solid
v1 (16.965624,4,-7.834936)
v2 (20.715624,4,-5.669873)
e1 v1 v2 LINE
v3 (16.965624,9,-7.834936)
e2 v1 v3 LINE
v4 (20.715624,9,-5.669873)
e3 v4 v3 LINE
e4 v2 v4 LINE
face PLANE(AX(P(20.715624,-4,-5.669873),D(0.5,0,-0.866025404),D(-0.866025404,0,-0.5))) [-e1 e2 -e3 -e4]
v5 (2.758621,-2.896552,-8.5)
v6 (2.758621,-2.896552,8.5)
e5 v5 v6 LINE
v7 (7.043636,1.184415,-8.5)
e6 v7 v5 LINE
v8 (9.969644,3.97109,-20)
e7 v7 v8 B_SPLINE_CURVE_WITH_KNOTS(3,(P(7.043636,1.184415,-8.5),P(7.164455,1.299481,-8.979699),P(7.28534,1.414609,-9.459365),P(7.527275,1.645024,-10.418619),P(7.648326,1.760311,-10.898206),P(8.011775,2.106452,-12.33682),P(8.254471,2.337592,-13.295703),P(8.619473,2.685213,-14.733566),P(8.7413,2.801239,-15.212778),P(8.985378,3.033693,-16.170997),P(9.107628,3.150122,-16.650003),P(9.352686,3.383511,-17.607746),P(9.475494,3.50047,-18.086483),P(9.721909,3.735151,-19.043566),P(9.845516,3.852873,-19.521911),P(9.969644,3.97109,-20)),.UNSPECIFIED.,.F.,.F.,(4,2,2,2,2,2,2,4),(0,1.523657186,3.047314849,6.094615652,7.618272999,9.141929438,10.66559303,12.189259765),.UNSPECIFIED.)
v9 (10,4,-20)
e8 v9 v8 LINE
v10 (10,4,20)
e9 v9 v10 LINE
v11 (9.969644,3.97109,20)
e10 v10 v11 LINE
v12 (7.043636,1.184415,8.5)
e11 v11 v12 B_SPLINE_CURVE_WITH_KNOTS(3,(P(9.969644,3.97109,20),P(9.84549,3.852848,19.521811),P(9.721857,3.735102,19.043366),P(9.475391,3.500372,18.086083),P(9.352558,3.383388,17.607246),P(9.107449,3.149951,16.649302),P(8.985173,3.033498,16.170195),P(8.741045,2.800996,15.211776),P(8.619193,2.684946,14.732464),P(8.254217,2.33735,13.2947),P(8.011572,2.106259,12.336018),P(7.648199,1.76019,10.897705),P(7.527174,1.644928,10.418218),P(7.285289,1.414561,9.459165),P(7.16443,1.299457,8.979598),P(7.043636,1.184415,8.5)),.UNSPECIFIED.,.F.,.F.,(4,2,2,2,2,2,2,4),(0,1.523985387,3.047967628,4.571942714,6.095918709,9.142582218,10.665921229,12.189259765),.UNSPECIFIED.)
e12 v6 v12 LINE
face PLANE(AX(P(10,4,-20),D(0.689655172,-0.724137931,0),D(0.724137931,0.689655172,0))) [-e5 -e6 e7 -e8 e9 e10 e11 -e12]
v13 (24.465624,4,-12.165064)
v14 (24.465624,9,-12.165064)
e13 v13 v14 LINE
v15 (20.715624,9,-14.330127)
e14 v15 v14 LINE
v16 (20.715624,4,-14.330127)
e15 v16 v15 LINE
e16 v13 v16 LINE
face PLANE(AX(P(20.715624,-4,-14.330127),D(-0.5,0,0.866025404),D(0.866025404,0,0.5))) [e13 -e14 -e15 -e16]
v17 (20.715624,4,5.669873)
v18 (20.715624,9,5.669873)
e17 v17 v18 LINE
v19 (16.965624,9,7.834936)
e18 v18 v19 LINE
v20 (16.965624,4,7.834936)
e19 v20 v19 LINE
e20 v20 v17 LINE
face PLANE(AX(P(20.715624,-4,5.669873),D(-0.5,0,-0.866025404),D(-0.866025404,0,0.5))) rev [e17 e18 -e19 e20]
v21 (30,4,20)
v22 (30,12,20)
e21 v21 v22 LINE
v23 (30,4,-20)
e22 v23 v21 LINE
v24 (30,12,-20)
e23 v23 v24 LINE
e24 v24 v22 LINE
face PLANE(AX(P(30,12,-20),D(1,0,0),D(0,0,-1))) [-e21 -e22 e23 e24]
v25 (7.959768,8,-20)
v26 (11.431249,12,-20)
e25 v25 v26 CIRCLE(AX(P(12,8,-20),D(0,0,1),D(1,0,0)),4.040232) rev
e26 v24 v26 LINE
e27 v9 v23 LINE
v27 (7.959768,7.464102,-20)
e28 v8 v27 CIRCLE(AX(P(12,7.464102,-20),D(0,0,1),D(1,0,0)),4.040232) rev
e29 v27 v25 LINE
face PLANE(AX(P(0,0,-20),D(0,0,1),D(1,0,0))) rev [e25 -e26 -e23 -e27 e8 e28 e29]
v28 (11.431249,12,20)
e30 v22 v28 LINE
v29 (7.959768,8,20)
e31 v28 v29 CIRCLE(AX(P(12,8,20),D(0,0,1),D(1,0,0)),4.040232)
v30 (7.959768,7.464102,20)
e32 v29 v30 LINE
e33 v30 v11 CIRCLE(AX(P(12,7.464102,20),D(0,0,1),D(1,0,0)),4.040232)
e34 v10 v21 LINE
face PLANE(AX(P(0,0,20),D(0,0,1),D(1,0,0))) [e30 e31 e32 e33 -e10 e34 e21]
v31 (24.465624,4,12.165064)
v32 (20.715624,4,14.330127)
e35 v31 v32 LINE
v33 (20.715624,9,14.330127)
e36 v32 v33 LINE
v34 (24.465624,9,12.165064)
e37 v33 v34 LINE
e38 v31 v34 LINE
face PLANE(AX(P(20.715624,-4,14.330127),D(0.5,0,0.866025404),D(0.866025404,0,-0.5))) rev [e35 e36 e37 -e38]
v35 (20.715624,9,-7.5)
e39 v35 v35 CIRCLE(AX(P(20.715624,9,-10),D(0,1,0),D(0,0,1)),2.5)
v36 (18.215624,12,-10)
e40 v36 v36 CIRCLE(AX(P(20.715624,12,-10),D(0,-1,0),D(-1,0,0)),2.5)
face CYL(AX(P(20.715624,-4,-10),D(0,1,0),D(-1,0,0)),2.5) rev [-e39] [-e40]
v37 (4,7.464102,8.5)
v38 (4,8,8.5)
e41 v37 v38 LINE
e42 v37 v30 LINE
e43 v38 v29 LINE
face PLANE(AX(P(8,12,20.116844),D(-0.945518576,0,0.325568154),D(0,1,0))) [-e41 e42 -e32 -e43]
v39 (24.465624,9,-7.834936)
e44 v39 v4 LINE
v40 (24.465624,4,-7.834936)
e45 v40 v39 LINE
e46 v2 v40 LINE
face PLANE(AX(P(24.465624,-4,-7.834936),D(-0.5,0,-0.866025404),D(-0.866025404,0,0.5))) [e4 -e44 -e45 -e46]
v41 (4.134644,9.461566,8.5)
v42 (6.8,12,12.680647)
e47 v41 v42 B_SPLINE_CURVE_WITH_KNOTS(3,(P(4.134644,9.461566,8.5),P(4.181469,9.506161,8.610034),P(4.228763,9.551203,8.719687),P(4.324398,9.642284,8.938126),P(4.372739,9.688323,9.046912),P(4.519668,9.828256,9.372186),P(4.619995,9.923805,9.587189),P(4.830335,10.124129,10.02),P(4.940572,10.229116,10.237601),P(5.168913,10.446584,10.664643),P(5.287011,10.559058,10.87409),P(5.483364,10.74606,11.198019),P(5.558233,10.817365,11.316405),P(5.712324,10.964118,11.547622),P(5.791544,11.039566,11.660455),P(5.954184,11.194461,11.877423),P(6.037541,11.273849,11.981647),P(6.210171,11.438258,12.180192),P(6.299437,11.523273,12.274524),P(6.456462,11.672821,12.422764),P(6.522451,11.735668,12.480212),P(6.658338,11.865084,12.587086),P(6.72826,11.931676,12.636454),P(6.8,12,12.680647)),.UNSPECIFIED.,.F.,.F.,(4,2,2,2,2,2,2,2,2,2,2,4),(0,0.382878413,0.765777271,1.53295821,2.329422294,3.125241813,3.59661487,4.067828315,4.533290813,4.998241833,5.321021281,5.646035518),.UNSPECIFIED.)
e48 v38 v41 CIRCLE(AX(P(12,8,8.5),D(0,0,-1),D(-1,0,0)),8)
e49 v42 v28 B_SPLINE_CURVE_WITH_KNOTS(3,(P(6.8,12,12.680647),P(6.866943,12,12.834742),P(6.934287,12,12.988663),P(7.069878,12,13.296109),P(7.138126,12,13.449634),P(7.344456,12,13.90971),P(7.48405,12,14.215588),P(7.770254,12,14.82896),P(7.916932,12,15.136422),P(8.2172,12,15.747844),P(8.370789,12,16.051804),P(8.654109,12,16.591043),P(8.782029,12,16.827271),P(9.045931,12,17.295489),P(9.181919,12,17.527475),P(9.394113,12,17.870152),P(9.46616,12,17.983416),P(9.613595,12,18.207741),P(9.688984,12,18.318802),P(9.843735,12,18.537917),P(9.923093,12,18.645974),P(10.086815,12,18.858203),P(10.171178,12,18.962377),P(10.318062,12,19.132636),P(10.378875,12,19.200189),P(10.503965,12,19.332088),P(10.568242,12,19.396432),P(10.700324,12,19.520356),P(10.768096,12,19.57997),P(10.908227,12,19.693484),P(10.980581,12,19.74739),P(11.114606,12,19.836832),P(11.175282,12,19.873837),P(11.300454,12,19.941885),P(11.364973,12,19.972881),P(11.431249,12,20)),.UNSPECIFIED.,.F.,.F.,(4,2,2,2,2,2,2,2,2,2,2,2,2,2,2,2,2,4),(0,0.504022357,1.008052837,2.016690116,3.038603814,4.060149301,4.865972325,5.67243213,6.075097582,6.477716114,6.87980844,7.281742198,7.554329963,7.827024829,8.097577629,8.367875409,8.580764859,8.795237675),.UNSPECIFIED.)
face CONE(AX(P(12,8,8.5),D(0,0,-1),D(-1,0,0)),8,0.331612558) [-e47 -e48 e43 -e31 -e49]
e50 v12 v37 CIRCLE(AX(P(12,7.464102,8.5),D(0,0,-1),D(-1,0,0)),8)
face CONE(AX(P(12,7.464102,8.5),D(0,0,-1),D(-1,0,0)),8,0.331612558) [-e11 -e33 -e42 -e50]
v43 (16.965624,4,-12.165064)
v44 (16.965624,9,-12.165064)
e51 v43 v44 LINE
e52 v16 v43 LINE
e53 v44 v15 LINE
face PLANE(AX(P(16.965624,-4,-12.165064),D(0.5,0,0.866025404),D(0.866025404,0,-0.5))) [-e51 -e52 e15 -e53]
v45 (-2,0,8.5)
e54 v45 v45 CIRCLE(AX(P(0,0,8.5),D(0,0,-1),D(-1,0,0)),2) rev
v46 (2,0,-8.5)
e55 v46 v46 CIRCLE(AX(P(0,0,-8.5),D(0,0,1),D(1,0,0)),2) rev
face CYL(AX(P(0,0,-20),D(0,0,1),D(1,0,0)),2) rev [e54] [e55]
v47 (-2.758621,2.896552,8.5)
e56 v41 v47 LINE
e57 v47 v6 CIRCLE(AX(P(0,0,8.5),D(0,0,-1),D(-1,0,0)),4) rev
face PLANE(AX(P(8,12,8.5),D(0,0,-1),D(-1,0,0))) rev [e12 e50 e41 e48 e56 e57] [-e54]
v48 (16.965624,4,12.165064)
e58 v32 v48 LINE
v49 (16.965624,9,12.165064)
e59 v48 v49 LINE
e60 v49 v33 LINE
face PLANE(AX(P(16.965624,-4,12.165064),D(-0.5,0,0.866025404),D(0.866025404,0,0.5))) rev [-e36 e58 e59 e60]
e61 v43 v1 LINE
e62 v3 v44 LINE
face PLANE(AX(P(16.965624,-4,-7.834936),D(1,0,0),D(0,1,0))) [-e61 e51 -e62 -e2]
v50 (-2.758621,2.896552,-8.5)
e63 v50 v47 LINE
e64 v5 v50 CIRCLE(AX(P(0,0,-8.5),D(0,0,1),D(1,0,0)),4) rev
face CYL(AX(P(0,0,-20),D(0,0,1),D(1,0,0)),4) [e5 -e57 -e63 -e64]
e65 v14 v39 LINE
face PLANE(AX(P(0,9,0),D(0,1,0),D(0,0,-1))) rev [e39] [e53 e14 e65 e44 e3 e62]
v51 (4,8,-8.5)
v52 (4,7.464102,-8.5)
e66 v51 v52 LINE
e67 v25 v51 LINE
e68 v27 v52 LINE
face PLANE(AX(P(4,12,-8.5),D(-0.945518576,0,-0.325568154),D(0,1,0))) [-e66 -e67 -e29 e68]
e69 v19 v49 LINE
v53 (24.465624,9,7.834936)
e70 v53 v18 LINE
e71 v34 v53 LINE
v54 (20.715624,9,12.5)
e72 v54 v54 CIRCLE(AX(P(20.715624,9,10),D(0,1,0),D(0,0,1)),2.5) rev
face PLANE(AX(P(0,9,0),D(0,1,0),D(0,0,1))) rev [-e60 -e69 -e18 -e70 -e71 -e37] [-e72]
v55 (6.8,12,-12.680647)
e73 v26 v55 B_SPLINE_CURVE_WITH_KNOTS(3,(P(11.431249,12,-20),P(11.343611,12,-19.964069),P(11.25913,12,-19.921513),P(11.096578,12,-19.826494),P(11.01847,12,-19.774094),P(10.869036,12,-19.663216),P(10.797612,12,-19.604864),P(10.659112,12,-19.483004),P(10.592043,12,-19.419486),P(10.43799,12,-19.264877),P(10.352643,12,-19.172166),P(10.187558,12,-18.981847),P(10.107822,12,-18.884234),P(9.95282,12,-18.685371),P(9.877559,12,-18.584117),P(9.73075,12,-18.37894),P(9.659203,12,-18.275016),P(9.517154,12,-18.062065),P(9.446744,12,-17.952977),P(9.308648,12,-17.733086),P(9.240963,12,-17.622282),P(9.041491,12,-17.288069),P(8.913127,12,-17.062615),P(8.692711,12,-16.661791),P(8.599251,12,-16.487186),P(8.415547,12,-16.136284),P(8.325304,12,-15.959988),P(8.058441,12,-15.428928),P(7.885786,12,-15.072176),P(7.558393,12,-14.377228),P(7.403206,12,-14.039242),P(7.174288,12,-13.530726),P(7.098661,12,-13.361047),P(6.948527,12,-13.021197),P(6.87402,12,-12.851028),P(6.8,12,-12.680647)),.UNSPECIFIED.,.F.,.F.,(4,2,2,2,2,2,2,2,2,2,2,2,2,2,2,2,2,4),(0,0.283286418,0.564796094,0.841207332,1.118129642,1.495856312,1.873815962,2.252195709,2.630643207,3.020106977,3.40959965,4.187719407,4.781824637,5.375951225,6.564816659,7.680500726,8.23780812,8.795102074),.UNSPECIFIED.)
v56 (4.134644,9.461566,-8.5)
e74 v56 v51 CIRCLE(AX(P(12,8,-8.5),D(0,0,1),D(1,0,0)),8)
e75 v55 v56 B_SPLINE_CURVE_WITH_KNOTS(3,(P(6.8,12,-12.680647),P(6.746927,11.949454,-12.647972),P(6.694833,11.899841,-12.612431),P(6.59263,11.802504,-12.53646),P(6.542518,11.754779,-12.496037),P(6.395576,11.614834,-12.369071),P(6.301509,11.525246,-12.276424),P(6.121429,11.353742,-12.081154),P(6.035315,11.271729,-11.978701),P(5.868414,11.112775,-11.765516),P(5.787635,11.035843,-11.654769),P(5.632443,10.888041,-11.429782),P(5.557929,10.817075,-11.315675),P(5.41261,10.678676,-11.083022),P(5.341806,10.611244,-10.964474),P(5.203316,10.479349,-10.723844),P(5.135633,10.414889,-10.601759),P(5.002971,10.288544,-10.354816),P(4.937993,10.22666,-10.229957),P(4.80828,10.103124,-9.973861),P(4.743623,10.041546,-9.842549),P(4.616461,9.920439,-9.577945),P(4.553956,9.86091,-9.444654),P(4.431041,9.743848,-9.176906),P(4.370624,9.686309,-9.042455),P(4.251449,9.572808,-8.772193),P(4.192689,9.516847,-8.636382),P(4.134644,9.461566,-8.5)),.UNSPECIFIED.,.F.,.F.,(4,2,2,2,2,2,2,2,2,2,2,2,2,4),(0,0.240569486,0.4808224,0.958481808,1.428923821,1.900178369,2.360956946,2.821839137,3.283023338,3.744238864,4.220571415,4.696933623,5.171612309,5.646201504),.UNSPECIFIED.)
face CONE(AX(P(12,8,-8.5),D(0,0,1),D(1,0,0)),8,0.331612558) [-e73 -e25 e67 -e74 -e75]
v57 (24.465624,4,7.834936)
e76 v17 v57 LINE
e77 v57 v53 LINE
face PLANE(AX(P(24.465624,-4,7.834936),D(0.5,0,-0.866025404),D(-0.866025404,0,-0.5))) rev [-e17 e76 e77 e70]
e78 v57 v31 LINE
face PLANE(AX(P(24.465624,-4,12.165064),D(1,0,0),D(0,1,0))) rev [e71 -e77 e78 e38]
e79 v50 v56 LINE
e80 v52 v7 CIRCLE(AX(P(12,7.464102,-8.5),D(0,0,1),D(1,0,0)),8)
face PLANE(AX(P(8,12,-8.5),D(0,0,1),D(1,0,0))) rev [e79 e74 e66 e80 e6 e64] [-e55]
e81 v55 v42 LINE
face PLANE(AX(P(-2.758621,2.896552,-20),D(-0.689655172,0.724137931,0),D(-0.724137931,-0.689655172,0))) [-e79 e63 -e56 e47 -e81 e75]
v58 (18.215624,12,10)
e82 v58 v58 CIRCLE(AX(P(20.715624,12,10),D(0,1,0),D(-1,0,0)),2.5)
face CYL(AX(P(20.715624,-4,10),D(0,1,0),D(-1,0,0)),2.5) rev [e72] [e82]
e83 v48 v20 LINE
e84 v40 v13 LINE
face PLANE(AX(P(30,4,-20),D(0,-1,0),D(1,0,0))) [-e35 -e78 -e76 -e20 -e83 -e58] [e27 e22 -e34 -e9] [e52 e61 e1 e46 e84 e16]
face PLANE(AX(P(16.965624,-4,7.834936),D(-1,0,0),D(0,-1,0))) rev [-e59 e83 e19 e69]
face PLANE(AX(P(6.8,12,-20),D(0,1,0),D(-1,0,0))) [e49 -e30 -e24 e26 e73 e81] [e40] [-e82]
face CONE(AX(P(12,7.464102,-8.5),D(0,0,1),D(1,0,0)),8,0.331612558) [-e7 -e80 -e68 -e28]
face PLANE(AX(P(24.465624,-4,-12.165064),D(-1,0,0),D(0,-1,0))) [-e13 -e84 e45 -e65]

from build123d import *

# Parameters (mm, degrees)
SKETCH1_R               = 2
BOSS_EXTRUDE1_DEPTH     = 20
CUT_EXTRUDE1_DEPTH      = 37.932370625
CUT_EXTRUDE1_DEPTH_BACK = 37.932370625
SKETCH2_W               = 20
SKETCH2_H               = 16.5
FILLET1_R               = 4
CHAMFER1_SIZE           = 4
CHAMFER1_SIZE_2         = 11.616843511
SKETCH4_R               = 2.5
CUT_EXTRUDE2_DEPTH      = 40.446165847
CUT_EXTRUDE3_START      = -3
CUT_EXTRUDE3_DEPTH      = 37.446165847


with BuildPart() as part:
    # Sketch1 → Boss-Extrude1 (new, symmetric)
    with BuildSketch(Plane.XY):
        with BuildLine():
            Line((-2.75862069, 2.896551724), (6.8, 12))
            Line((6.8, 12), (30, 12))
            Line((30, 12), (30, 4))
            Line((30, 4), (10, 4))
            Line((10, 4), (2.75862069, -2.896551724))
            ThreePointArc((2.75862069, -2.896551724), (-2.896551724, -2.75862069), (-2.75862069, 2.896551724))
        make_face()
        Circle(SKETCH1_R, mode=Mode.SUBTRACT)
    extrude(amount=BOSS_EXTRUDE1_DEPTH, both=True)

    # Sketch2 → Cut-Extrude1 (cut, two sides: drawn at the far end of the back side and taken through both)
    with BuildSketch(Plane.XZ.offset(-4).offset(-CUT_EXTRUDE1_DEPTH_BACK)):
        with Locations((-2, 16.75)):
            Rectangle(SKETCH2_W, SKETCH2_H)
        with Locations((-2, -16.75)):
            Rectangle(SKETCH2_W, SKETCH2_H)
    extrude(amount=CUT_EXTRUDE1_DEPTH + CUT_EXTRUDE1_DEPTH_BACK, mode=Mode.SUBTRACT)

    # Fillet1
    # the kernel refuses this fillet: 4 mm, written as the material it takes off along each edge
    with BuildSketch(Plane(origin=(8, 2.095238095, -33.4221588), x_dir=(0.7241379310344825, 0.6896551724137934, 0), z_dir=(0, 0, 1))) as fillet1_piece_1:
        with BuildLine():
            CenterArc((6.599216221, 1.129177032), FILLET1_R, 136.397181027, 60)
            Line((3.702664496, 3.887797721), (3.644733462, 3.942970135))
            Line((3.644733462, 3.942970135), (-0.057931034, 0.055172414))
            Line((-0.057931034, 0.055172414), (0, -0.08))
            ThreePointArc((0, -0.08), (1.380952381, -0.08), (2.685158533, -0.022583541))
            Line((2.685158533, -0.022583541), (2.761904762, 0))
        make_face()
    extrude(amount=24.9221588, mode=Mode.SUBTRACT)
    with BuildSketch(Plane(origin=(8, 12, -8.5), x_dir=(0, -1, 0), z_dir=(0, 0, -1))) as fillet1_piece_2:
        with BuildLine():
            CenterArc((FILLET1_R, -FILLET1_R), FILLET1_R, 90, 90)
            Line((0, -FILLET1_R), (-FILLET1_R * 0.02, -FILLET1_R))
            Line((-FILLET1_R * 0.02, -FILLET1_R), (-FILLET1_R * 0.02, FILLET1_R * 0.02))
            Line((-FILLET1_R * 0.02, FILLET1_R * 0.02), (FILLET1_R, FILLET1_R * 0.02))
            Line((FILLET1_R, FILLET1_R * 0.02), (FILLET1_R, 0))
        make_face()
    extrude(amount=21.5, mode=Mode.SUBTRACT)
    with BuildSketch(Plane(origin=(8, 12, 8.5), x_dir=(0, -1, 0), z_dir=(0, 0, 1))) as fillet1_piece_3:
        with BuildLine():
            CenterArc((FILLET1_R, FILLET1_R), FILLET1_R, 180, 90)
            Line((0, FILLET1_R), (-FILLET1_R * 0.02, FILLET1_R))
            Line((-FILLET1_R * 0.02, FILLET1_R), (-FILLET1_R * 0.02, -FILLET1_R * 0.02))
            Line((-FILLET1_R * 0.02, -FILLET1_R * 0.02), (FILLET1_R, -FILLET1_R * 0.02))
            Line((FILLET1_R, -FILLET1_R * 0.02), (FILLET1_R, 0))
        make_face()
    extrude(amount=21.5, mode=Mode.SUBTRACT)
    with BuildSketch(Plane(origin=(8, 2.095238095, 33.4221588), x_dir=(0.7241379310344824, 0.6896551724137936, 0), z_dir=(0, 0, -1))) as fillet1_piece_4:
        with BuildLine():
            CenterArc((6.599216221, -1.129177032), FILLET1_R, 163.602818973, 60)
            Line((3.702664496, -3.887797721), (3.644733462, -3.942970135))
            Line((3.644733462, -3.942970135), (-0.057931034, -0.055172414))
            Line((-0.057931034, -0.055172414), (0, 0.08))
            ThreePointArc((0, 0.08), (1.380952381, 0.08), (2.685158533, 0.022583541))
            Line((2.685158533, 0.022583541), (2.761904762, 0))
        make_face()
    extrude(amount=24.9221588, mode=Mode.SUBTRACT)

    # Chamfer1
    # the kernel refuses this chamfer: 11.616843511, 4 mm, written as the material it adds along each edge
    with BuildSketch(Plane(origin=(12, 8, -8.5), x_dir=(-1, 0, 0), z_dir=(0, -1, 0))) as chamfer1_piece_1_section:
        Polygon((4 + CHAMFER1_SIZE, 0), (4, CHAMFER1_SIZE_2), (4, 0), align=None)
    chamfer1_piece_1 = revolve(axis=Axis((12, 8, -8.5), (0, 0, -1)), revolution_arc=359.64, mode=Mode.PRIVATE)
    chamfer1_piece_1 = split(chamfer1_piece_1, bisect_by=Plane(origin=(6.815559228, 9.673675178, -20), z_dir=(0, 0, 1)), keep=Keep.TOP, mode=Mode.PRIVATE)
    chamfer1_piece_1 = split(chamfer1_piece_1, bisect_by=Plane(origin=(6.815559228, 12, -12.048091189), z_dir=(0, -1, 0)), keep=Keep.TOP, mode=Mode.PRIVATE)
    chamfer1_piece_1 = split(chamfer1_piece_1, bisect_by=Plane(origin=(5.646379541, 10.901313849, -12.048091189), z_dir=(0.6896551724137935, -0.7241379310344824, 0)), keep=Keep.TOP, mode=Mode.PRIVATE)
    chamfer1_piece_1 = split(chamfer1_piece_1, bisect_by=Plane(origin=(11.163620921, 5.1082104, -12.048091189), z_dir=(-0.6896551724137935, 0.7241379310344825, 0)), keep=Keep.TOP, mode=Mode.PRIVATE)
    add(chamfer1_piece_1)
    with BuildSketch(Plane(origin=(8, 7.464101615, -8.5), x_dir=(-0.9944459243087849, 0, 0.10524877018591122), z_dir=(0, 1, 0))) as chamfer1_piece_2_section:
        Polygon((CHAMFER1_SIZE * 0.994445924309, -CHAMFER1_SIZE * 0.105248770186), (-CHAMFER1_SIZE_2 * 0.105248770183, -CHAMFER1_SIZE_2 * 0.994445924283), (0, 0), align=None)
    chamfer1_piece_2 = extrude(amount=0.535898385, mode=Mode.PRIVATE)
    chamfer1_piece_2 = split(chamfer1_piece_2, bisect_by=Plane(origin=(6.666533122, 7.732050808, -20), z_dir=(0, 0, 1)), keep=Keep.TOP, mode=Mode.PRIVATE)
    add(chamfer1_piece_2)
    with BuildSketch(Plane(origin=(12, 7.464101615, -8.5), x_dir=(-1, 0, 0), z_dir=(0, 1, 0))) as chamfer1_piece_3_section:
        Polygon((4 + CHAMFER1_SIZE, 0), (4, -CHAMFER1_SIZE_2), (4, 0), align=None)
    chamfer1_piece_3 = revolve(axis=Axis((12, 7.464101615, -8.5), (0, 0, 1)), revolution_arc=359.64, mode=Mode.PRIVATE)
    chamfer1_piece_3 = split(chamfer1_piece_3, bisect_by=Plane(origin=(6.73533338, 5.888138527, -20), z_dir=(0, 0, 1)), keep=Keep.TOP, mode=Mode.PRIVATE)
    chamfer1_piece_3 = split(chamfer1_piece_3, bisect_by=Plane(origin=(6.73533338, 12, -12.010330429), z_dir=(0, -1, 0)), keep=Keep.TOP, mode=Mode.PRIVATE)
    chamfer1_piece_3 = split(chamfer1_piece_3, bisect_by=Plane(origin=(3.713793343, 9.060755565, -12.010330429), z_dir=(0.6896551724137935, -0.7241379310344824, 0)), keep=Keep.TOP, mode=Mode.PRIVATE)
    chamfer1_piece_3 = split(chamfer1_piece_3, bisect_by=Plane(origin=(9.231034723, 3.267652117, -12.010330429), z_dir=(-0.6896551724137935, 0.7241379310344825, 0)), keep=Keep.TOP, mode=Mode.PRIVATE)
    add(chamfer1_piece_3)
    with BuildSketch(Plane(origin=(12, 8, 8.5), x_dir=(-0.9999802608561372, -0.006283143965558626, 0), z_dir=(-0.006283143965558626, 0.9999802608561372, 0))) as chamfer1_piece_4_section:
        Polygon((-4, CHAMFER1_SIZE_2), (-4 - CHAMFER1_SIZE, 0), (-4, 0), align=None)
    chamfer1_piece_4 = revolve(axis=Axis((12, 8, 8.5), (0, 0, 1)), revolution_arc=359.64, mode=Mode.PRIVATE)
    chamfer1_piece_4 = split(chamfer1_piece_4, bisect_by=Plane(origin=(8.929227056, 11.070772944, 20), z_dir=(0, 0, -1)), keep=Keep.TOP, mode=Mode.PRIVATE)
    chamfer1_piece_4 = split(chamfer1_piece_4, bisect_by=Plane(origin=(8.929227056, 12, 13.636607489), z_dir=(0, -1, 0)), keep=Keep.TOP, mode=Mode.PRIVATE)
    chamfer1_piece_4 = split(chamfer1_piece_4, bisect_by=Plane(origin=(7.452453946, 12.62138471, 13.636607489), z_dir=(0.6896551724137935, -0.7241379310344824, 0)), keep=Keep.TOP, mode=Mode.PRIVATE)
    chamfer1_piece_4 = split(chamfer1_piece_4, bisect_by=Plane(origin=(12.969695325, 6.828281262, 13.636607489), z_dir=(-0.6896551724137935, 0.7241379310344825, 0)), keep=Keep.TOP, mode=Mode.PRIVATE)
    add(chamfer1_piece_4)
    with BuildSketch(Plane(origin=(8, 8, 8.5), x_dir=(0.012547158200392034, 0, 0.9999212813122313), z_dir=(0, -1, 0))) as chamfer1_piece_5_section:
        Polygon((CHAMFER1_SIZE_2 * 0.999921281287, CHAMFER1_SIZE_2 * 0.0125471582001), (-CHAMFER1_SIZE * 0.0125471582004, CHAMFER1_SIZE * 0.999921281312), (0, 0), align=None)
    chamfer1_piece_5 = extrude(amount=0.535898385, mode=Mode.PRIVATE)
    chamfer1_piece_5 = split(chamfer1_piece_5, bisect_by=Plane(origin=(6.666533122, 7.732050808, 20), z_dir=(0, 0, -1)), keep=Keep.TOP, mode=Mode.PRIVATE)
    add(chamfer1_piece_5)
    with BuildSketch(Plane(origin=(12, 7.464101615, 8.5), x_dir=(-0.9999802608561402, 0.006283143965082117, 0), z_dir=(-0.006283143965082117, -0.9999802608561402, 0))) as chamfer1_piece_6_section:
        Polygon((-4, -CHAMFER1_SIZE_2), (-4 - CHAMFER1_SIZE, 0), (-4, 0), align=None)
    chamfer1_piece_6 = revolve(axis=Axis((12, 7.464101615, 8.5), (0, 0, -1)), revolution_arc=359.64, mode=Mode.PRIVATE)
    chamfer1_piece_6 = split(chamfer1_piece_6, bisect_by=Plane(origin=(8.748719475, 3.446621368, 20), z_dir=(0, 0, -1)), keep=Keep.TOP, mode=Mode.PRIVATE)
    chamfer1_piece_6 = split(chamfer1_piece_6, bisect_by=Plane(origin=(8.748719475, 12, 12.595227268), z_dir=(0, -1, 0)), keep=Keep.TOP, mode=Mode.PRIVATE)
    chamfer1_piece_6 = split(chamfer1_piece_6, bisect_by=Plane(origin=(3.55025715, 8.905006809, 12.595227268), z_dir=(0.6896551724137935, -0.7241379310344824, 0)), keep=Keep.TOP, mode=Mode.PRIVATE)
    chamfer1_piece_6 = split(chamfer1_piece_6, bisect_by=Plane(origin=(9.067498529, 3.111903361, 12.595227268), z_dir=(-0.6896551724137935, 0.7241379310344825, 0)), keep=Keep.TOP, mode=Mode.PRIVATE)
    add(chamfer1_piece_6)

    # Sketch4 → Cut-Extrude2 (cut, through all)
    with BuildSketch(Plane(origin=(0, 12, 0), x_dir=(1, 0, 0), z_dir=(0, 1, 0))):
        with Locations(Location((20.715624268, -10, 0), (0, 0, 180))):
            Circle(SKETCH4_R)
    cut_extrude2 = extrude(amount=-CUT_EXTRUDE2_DEPTH, mode=Mode.SUBTRACT)

    # Sketch5 → Cut-Extrude3 (cut, through all)
    with BuildSketch(Plane(origin=(0, 12, 0), x_dir=(1, 0, 0), z_dir=(0, 1, 0)).offset(CUT_EXTRUDE3_START)):
        Polygon((20.715624268, -14.330127019), (24.465624268, -12.165063509), (24.465624268, -7.834936491), (20.715624268, -5.669872981), (16.965624268, -7.834936491), (16.965624268, -12.165063509), align=None)
    cut_extrude3 = extrude(amount=-CUT_EXTRUDE3_DEPTH, mode=Mode.SUBTRACT)

    # Mirror1: Cut-Extrude2, Cut-Extrude3 across plane
    add(cut_extrude2.mirror(Plane.XY), mode=Mode.SUBTRACT)
    add(cut_extrude3.mirror(Plane.XY), mode=Mode.SUBTRACT)


solid = part.part
